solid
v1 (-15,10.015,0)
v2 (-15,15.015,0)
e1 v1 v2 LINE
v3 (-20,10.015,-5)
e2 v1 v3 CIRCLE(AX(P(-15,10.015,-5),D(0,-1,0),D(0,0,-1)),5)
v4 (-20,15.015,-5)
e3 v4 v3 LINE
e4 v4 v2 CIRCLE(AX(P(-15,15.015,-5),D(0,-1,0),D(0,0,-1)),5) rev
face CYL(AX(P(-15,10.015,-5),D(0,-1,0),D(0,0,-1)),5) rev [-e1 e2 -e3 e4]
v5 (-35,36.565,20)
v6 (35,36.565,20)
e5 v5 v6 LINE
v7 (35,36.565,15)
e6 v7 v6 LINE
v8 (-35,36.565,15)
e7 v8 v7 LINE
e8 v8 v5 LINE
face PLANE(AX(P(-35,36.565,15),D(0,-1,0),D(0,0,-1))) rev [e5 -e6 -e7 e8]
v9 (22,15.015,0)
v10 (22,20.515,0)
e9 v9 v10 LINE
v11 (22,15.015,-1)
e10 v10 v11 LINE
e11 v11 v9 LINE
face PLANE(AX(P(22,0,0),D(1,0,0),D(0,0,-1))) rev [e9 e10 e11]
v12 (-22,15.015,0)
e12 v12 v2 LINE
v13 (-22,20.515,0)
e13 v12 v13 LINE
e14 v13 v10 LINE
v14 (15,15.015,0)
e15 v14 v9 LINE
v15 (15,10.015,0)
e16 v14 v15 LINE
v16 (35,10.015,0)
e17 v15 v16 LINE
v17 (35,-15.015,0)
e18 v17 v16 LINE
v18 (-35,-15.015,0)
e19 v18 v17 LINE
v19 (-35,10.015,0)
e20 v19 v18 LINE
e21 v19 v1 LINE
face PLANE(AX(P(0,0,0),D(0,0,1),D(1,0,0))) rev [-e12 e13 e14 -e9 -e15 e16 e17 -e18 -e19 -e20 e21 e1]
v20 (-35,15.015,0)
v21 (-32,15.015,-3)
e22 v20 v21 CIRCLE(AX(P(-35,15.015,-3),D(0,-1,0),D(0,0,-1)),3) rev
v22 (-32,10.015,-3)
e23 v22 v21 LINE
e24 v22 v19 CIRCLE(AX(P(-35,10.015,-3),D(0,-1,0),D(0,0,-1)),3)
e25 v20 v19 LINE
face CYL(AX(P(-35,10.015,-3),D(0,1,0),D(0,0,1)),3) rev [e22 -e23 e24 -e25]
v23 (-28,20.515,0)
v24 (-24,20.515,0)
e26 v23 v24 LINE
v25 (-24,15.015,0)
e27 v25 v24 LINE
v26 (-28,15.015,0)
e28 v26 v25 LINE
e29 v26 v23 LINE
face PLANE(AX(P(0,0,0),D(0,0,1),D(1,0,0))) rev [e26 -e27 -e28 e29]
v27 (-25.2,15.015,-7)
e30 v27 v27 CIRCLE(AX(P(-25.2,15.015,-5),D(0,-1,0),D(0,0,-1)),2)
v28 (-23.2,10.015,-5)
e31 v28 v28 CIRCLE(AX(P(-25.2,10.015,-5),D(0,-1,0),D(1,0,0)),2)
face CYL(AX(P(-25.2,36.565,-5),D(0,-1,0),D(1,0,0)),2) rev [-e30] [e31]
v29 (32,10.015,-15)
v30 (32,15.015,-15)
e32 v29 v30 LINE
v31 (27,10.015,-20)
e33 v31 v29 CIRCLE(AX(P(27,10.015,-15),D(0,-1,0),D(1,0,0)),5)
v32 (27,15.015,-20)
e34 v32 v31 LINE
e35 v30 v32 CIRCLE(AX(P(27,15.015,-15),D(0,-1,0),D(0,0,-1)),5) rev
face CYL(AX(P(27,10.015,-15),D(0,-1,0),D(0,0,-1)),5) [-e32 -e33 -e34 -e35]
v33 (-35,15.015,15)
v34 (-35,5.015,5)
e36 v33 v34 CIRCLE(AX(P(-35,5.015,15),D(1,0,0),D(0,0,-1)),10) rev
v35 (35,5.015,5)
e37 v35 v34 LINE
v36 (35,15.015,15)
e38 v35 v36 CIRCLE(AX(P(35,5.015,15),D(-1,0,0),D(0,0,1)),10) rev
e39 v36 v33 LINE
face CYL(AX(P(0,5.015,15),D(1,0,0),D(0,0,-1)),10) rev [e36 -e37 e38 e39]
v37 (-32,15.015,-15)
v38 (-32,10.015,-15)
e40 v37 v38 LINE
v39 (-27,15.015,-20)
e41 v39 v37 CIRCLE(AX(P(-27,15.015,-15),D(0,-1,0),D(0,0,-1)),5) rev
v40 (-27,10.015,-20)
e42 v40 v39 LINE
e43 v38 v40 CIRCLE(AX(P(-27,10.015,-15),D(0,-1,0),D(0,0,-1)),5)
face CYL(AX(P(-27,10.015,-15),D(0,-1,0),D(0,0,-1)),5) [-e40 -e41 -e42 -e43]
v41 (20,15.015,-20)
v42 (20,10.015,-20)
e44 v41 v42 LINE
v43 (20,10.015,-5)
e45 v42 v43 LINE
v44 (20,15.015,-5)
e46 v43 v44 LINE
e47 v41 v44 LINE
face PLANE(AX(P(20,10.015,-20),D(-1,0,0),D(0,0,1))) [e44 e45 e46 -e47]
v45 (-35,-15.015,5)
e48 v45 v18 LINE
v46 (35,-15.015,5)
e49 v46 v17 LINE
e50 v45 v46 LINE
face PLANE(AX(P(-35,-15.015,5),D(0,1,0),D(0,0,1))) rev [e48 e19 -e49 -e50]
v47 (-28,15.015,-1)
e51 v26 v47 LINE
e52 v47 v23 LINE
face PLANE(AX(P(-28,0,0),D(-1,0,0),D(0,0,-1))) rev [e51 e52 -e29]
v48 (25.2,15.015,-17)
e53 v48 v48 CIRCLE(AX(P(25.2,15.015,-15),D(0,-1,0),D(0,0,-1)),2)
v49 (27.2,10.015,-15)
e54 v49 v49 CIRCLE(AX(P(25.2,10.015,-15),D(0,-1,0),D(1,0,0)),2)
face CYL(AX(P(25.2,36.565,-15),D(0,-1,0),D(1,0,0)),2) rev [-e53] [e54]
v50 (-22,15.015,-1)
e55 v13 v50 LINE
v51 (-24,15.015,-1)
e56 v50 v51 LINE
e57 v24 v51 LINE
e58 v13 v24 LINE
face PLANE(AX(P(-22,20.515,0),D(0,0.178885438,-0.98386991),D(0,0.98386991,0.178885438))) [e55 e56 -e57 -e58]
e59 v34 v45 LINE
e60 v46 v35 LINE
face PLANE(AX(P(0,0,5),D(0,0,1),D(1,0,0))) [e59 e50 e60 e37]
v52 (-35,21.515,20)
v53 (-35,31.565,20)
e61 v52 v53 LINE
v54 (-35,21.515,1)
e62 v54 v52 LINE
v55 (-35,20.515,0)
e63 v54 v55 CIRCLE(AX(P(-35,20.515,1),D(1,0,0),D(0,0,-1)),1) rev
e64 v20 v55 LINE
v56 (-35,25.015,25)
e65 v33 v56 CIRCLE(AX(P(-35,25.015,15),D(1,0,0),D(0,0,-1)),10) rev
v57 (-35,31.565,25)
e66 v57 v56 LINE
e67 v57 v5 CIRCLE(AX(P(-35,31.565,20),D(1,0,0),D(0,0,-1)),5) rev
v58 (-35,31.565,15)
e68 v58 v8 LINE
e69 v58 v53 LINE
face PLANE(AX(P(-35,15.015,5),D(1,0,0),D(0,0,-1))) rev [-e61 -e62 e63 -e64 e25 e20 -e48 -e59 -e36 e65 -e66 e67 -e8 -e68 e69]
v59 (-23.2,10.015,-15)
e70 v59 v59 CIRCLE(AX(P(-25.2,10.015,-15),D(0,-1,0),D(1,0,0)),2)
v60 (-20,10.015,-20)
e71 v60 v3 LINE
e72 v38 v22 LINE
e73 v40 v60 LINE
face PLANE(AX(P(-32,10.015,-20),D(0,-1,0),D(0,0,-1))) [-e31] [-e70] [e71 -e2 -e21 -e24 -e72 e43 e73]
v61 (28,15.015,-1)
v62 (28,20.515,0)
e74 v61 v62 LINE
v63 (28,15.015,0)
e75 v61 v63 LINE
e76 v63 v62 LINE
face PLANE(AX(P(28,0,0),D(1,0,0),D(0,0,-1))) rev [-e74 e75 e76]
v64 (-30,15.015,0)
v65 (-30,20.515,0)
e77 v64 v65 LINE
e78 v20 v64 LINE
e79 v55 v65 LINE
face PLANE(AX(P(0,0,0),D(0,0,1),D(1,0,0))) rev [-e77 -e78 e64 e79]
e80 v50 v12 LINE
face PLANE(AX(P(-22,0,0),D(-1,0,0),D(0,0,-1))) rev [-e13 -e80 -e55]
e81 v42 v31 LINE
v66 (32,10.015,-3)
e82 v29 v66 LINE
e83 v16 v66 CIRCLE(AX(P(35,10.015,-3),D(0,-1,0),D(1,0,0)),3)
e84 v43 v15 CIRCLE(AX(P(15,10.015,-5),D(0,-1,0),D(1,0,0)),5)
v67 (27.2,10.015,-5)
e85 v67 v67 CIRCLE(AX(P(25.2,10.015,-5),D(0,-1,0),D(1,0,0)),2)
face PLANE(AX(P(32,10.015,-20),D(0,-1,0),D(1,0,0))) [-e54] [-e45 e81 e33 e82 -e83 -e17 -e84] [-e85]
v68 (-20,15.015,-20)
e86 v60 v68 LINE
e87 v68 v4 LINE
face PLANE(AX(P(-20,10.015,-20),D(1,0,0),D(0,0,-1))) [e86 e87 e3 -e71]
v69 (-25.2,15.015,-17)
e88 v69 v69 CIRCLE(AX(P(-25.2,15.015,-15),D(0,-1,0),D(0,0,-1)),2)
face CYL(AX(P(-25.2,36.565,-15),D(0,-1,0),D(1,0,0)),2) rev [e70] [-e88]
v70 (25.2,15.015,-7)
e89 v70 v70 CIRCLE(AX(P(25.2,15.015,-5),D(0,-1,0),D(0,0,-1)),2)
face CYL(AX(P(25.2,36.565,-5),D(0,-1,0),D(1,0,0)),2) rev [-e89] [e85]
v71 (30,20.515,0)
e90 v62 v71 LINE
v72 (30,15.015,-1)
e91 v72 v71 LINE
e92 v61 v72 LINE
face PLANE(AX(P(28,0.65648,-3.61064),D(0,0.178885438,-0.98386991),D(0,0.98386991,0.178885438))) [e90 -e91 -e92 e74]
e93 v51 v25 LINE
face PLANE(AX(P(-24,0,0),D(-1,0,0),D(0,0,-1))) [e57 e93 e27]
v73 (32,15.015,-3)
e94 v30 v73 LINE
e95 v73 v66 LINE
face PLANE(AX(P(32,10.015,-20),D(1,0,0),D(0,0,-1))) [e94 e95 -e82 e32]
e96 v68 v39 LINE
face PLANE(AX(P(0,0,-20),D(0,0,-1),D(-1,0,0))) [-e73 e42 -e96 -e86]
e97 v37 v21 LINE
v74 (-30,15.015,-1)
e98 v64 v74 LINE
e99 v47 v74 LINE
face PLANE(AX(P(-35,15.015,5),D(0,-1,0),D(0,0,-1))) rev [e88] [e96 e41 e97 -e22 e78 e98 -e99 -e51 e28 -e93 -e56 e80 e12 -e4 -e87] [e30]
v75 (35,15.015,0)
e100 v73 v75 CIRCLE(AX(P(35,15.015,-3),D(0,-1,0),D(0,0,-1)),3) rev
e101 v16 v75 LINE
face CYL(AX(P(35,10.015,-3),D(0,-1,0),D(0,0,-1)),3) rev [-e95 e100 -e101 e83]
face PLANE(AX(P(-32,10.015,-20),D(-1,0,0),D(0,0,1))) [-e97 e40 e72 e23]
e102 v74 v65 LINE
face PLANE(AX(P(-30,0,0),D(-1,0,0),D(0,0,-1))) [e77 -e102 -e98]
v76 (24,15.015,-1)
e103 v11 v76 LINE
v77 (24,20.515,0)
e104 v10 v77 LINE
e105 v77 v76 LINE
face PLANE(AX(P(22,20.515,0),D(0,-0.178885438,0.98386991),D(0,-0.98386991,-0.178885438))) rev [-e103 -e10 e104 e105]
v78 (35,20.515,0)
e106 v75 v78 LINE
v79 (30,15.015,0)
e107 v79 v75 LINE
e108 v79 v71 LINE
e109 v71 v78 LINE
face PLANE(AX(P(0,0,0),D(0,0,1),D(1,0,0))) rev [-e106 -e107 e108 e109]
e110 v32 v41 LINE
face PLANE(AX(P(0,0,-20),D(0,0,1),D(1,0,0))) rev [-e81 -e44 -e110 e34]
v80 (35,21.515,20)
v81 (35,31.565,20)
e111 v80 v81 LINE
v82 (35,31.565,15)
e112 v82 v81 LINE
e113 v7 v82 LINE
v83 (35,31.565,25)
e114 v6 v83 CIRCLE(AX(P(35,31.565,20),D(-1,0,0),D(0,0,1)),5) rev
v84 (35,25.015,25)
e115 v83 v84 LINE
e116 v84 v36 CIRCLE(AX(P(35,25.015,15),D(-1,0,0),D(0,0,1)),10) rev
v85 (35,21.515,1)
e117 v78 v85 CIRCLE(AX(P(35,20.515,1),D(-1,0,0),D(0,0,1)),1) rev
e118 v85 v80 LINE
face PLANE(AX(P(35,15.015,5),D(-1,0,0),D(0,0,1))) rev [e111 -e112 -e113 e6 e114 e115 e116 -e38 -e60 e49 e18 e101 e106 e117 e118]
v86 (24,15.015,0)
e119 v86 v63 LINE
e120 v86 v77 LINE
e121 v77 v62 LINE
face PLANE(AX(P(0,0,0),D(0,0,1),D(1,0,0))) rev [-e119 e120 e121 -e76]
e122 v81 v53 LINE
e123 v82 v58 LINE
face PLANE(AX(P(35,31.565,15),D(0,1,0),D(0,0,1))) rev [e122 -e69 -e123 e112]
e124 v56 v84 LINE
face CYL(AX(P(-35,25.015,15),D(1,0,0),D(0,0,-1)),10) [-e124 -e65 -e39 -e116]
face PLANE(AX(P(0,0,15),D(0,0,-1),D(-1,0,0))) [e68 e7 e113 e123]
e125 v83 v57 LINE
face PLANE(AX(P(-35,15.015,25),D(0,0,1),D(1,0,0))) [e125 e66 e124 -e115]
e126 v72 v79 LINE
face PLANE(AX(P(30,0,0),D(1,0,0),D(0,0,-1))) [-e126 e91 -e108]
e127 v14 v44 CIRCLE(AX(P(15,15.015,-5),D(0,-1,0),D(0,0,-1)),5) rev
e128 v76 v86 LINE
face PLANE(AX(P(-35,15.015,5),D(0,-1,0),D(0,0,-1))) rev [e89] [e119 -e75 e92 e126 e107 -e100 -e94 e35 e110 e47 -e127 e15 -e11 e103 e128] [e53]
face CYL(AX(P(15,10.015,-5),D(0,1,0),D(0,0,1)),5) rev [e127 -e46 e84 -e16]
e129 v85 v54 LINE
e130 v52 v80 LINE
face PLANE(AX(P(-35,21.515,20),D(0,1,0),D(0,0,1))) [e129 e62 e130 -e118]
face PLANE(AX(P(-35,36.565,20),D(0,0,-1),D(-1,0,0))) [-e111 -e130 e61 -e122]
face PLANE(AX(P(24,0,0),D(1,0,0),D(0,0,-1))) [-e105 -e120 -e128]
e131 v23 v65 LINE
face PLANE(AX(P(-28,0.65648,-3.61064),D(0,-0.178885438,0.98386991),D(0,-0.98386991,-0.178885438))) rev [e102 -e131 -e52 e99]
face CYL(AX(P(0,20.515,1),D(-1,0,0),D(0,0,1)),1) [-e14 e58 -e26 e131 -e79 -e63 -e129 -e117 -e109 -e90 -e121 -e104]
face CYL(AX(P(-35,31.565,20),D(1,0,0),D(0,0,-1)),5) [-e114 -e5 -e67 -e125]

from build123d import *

# Parameters (mm, degrees)
ESQUISSE1_W             = 70
ESQUISSE1_H             = 30.03
BOSS_EXTRU_1_DEPTH      = 5
BOSS_EXTRU_2_START      = -5
ESQUISSE2_W             = 12
ESQUISSE2_H             = 5
BOSS_EXTRU_2_DEPTH      = 20
CONG_1_R                = 3
CONG_2_R                = 3
CONG_12_R               = 5
CONG_11_R               = 5
BOSS_EXTRU_5_DEPTH      = 70
CONG_13_R               = 10
CONG_14_R               = 5
ESQUISSE7_W             = 70
ESQUISSE7_H             = 5
BOSS_EXTRU_6_DEPTH      = 5
CONG_15_R               = 10
CONG_16_R               = 1
BOSS_EXTRU_7_START      = -2
BOSS_EXTRU_7_DEPTH      = 2
BOSS_EXTRU_8_START      = 4
BOSS_EXTRU_8_DEPTH      = 2
ESQUISSE11_R            = 2
ENL_V_MAT_EXTRU_1_DEPTH = 51.546043366
CONG_17_R               = 5


with BuildPart() as part:
    # Esquisse1 → Boss.-Extru.1 (new body)
    with BuildSketch(Plane.XY):
        Rectangle(ESQUISSE1_W, ESQUISSE1_H)
    extrude(amount=BOSS_EXTRU_1_DEPTH)

    # Esquisse2 → Boss.-Extru.2 (add)
    with BuildSketch(Plane.XY.offset(5).offset(BOSS_EXTRU_2_START)):
        with Locations((-26, 12.515)):
            Rectangle(ESQUISSE2_W, ESQUISSE2_H)
        with Locations((26, 12.515)):
            Rectangle(ESQUISSE2_W, ESQUISSE2_H)
    extrude(amount=-BOSS_EXTRU_2_DEPTH)

    # Congé1
    cong_1_edges = [part.edges().sort_by_distance(p)[0] for p in [
        (32, 12.515, 0),
    ]]
    fillet(cong_1_edges, radius=CONG_1_R - 0.0001)  # a hair under: the kernel refuses the full size

    # Congé2
    cong_2_edges = [part.edges().sort_by_distance(p)[0] for p in [
        (-32, 12.515, 0),
    ]]
    fillet(cong_2_edges, radius=CONG_2_R - 0.0001)  # a hair under: the kernel refuses the full size

    # Congé12
    cong_12_edges = [part.edges().sort_by_distance(p)[0] for p in [
        (-20, 12.515, 0),
    ]]
    fillet(cong_12_edges, radius=CONG_12_R)

    # Congé11
    cong_11_edges = [part.edges().sort_by_distance(p)[0] for p in [
        (20, 12.515, 0),
    ]]
    fillet(cong_11_edges, radius=CONG_11_R)

    # Esquisse6 → Boss.-Extru.5 (add, through all)
    with BuildSketch(Plane(origin=(35, 0, 0), x_dir=(0, 0, -1), z_dir=(1, 0, 0))):
        Polygon((-5, 15.015), (-25, 15.015), (-25, 36.565), (-20, 36.565), (-20, 21.515), (-5, 21.515), (0, 21.515), (0, 15.015), align=None)
    extrude(amount=-BOSS_EXTRU_5_DEPTH)

    # Congé13
    cong_13_edges = [part.edges().sort_by_distance(p)[0] for p in [
        (0, 15.015, 25),
    ]]
    fillet(cong_13_edges, radius=CONG_13_R)

    # Congé14
    cong_14_edges = [part.edges().sort_by_distance(p)[0] for p in [
        (0, 36.565, 25),
    ]]
    fillet(cong_14_edges, radius=CONG_14_R - 0.0001)  # a hair under: the kernel refuses the full size

    # Esquisse7 → Boss.-Extru.6 (add)
    with BuildSketch(Plane(origin=(0, 0, 20), x_dir=(-1, 0, 0), z_dir=(0, 0, -1))):
        with Locations((0, 34.065)):
            Rectangle(ESQUISSE7_W, ESQUISSE7_H)
    extrude(amount=BOSS_EXTRU_6_DEPTH)

    # Congé15
    cong_15_edges = [part.edges().sort_by_distance(p)[0] for p in [
        (0, 15.015, 5),
    ]]
    fillet(cong_15_edges, radius=CONG_15_R - 0.0001)  # a hair under: the kernel refuses the full size

    # Congé16
    cong_16_edges = [part.edges().sort_by_distance(p)[0] for p in [
        (0, 21.515, 0),
    ]]
    fillet(cong_16_edges, radius=CONG_16_R)

    # Esquisse8 → Boss.-Extru.7 (add)
    with BuildSketch(Plane(origin=(32, 0, 0), x_dir=(0, 0, -1), z_dir=(1, 0, 0)).offset(BOSS_EXTRU_7_START)):
        Polygon((1, 15.015), (0, 20.515), (0, 15.009679375), align=None)
    boss_extru_7 = extrude(amount=-BOSS_EXTRU_7_DEPTH)

    # Esquisse9 → Boss.-Extru.8 (add)
    with BuildSketch(Plane.ZY.offset(-28).offset(BOSS_EXTRU_8_START)):
        Polygon((0, 20.515), (-1, 15.015), (0, 15.015), align=None)
    boss_extru_8 = extrude(amount=BOSS_EXTRU_8_DEPTH)

    # Symétrie3: Boss.-Extru.7, Boss.-Extru.8 across plane
    add(boss_extru_7.mirror(Plane(origin=(0, 0, 0), x_dir=(0, 0, 1), z_dir=(1, 0, 0))))
    add(boss_extru_8.mirror(Plane(origin=(0, 0, 0), x_dir=(0, 0, 1), z_dir=(1, 0, 0))))

    # Esquisse11 → Enlèv. mat.-Extru.1 (cut, through all)
    with BuildSketch(Plane.XZ.offset(-10.015)):
        with Locations((25.2, -15)):
            Circle(ESQUISSE11_R)
        with Locations((25.2, -5)):
            Circle(ESQUISSE11_R)
        with Locations((-25.2, -15)):
            Circle(ESQUISSE11_R)
        with Locations((-25.2, -5)):
            Circle(ESQUISSE11_R)
    extrude(amount=-ENL_V_MAT_EXTRU_1_DEPTH, mode=Mode.SUBTRACT)

    # Congé17
    cong_17_edges = [part.edges().sort_by_distance(p)[0] for p in [
        (-32, 12.515, -20),
        (32, 12.515, -20),
    ]]
    fillet(cong_17_edges, radius=CONG_17_R)


solid = part.part
